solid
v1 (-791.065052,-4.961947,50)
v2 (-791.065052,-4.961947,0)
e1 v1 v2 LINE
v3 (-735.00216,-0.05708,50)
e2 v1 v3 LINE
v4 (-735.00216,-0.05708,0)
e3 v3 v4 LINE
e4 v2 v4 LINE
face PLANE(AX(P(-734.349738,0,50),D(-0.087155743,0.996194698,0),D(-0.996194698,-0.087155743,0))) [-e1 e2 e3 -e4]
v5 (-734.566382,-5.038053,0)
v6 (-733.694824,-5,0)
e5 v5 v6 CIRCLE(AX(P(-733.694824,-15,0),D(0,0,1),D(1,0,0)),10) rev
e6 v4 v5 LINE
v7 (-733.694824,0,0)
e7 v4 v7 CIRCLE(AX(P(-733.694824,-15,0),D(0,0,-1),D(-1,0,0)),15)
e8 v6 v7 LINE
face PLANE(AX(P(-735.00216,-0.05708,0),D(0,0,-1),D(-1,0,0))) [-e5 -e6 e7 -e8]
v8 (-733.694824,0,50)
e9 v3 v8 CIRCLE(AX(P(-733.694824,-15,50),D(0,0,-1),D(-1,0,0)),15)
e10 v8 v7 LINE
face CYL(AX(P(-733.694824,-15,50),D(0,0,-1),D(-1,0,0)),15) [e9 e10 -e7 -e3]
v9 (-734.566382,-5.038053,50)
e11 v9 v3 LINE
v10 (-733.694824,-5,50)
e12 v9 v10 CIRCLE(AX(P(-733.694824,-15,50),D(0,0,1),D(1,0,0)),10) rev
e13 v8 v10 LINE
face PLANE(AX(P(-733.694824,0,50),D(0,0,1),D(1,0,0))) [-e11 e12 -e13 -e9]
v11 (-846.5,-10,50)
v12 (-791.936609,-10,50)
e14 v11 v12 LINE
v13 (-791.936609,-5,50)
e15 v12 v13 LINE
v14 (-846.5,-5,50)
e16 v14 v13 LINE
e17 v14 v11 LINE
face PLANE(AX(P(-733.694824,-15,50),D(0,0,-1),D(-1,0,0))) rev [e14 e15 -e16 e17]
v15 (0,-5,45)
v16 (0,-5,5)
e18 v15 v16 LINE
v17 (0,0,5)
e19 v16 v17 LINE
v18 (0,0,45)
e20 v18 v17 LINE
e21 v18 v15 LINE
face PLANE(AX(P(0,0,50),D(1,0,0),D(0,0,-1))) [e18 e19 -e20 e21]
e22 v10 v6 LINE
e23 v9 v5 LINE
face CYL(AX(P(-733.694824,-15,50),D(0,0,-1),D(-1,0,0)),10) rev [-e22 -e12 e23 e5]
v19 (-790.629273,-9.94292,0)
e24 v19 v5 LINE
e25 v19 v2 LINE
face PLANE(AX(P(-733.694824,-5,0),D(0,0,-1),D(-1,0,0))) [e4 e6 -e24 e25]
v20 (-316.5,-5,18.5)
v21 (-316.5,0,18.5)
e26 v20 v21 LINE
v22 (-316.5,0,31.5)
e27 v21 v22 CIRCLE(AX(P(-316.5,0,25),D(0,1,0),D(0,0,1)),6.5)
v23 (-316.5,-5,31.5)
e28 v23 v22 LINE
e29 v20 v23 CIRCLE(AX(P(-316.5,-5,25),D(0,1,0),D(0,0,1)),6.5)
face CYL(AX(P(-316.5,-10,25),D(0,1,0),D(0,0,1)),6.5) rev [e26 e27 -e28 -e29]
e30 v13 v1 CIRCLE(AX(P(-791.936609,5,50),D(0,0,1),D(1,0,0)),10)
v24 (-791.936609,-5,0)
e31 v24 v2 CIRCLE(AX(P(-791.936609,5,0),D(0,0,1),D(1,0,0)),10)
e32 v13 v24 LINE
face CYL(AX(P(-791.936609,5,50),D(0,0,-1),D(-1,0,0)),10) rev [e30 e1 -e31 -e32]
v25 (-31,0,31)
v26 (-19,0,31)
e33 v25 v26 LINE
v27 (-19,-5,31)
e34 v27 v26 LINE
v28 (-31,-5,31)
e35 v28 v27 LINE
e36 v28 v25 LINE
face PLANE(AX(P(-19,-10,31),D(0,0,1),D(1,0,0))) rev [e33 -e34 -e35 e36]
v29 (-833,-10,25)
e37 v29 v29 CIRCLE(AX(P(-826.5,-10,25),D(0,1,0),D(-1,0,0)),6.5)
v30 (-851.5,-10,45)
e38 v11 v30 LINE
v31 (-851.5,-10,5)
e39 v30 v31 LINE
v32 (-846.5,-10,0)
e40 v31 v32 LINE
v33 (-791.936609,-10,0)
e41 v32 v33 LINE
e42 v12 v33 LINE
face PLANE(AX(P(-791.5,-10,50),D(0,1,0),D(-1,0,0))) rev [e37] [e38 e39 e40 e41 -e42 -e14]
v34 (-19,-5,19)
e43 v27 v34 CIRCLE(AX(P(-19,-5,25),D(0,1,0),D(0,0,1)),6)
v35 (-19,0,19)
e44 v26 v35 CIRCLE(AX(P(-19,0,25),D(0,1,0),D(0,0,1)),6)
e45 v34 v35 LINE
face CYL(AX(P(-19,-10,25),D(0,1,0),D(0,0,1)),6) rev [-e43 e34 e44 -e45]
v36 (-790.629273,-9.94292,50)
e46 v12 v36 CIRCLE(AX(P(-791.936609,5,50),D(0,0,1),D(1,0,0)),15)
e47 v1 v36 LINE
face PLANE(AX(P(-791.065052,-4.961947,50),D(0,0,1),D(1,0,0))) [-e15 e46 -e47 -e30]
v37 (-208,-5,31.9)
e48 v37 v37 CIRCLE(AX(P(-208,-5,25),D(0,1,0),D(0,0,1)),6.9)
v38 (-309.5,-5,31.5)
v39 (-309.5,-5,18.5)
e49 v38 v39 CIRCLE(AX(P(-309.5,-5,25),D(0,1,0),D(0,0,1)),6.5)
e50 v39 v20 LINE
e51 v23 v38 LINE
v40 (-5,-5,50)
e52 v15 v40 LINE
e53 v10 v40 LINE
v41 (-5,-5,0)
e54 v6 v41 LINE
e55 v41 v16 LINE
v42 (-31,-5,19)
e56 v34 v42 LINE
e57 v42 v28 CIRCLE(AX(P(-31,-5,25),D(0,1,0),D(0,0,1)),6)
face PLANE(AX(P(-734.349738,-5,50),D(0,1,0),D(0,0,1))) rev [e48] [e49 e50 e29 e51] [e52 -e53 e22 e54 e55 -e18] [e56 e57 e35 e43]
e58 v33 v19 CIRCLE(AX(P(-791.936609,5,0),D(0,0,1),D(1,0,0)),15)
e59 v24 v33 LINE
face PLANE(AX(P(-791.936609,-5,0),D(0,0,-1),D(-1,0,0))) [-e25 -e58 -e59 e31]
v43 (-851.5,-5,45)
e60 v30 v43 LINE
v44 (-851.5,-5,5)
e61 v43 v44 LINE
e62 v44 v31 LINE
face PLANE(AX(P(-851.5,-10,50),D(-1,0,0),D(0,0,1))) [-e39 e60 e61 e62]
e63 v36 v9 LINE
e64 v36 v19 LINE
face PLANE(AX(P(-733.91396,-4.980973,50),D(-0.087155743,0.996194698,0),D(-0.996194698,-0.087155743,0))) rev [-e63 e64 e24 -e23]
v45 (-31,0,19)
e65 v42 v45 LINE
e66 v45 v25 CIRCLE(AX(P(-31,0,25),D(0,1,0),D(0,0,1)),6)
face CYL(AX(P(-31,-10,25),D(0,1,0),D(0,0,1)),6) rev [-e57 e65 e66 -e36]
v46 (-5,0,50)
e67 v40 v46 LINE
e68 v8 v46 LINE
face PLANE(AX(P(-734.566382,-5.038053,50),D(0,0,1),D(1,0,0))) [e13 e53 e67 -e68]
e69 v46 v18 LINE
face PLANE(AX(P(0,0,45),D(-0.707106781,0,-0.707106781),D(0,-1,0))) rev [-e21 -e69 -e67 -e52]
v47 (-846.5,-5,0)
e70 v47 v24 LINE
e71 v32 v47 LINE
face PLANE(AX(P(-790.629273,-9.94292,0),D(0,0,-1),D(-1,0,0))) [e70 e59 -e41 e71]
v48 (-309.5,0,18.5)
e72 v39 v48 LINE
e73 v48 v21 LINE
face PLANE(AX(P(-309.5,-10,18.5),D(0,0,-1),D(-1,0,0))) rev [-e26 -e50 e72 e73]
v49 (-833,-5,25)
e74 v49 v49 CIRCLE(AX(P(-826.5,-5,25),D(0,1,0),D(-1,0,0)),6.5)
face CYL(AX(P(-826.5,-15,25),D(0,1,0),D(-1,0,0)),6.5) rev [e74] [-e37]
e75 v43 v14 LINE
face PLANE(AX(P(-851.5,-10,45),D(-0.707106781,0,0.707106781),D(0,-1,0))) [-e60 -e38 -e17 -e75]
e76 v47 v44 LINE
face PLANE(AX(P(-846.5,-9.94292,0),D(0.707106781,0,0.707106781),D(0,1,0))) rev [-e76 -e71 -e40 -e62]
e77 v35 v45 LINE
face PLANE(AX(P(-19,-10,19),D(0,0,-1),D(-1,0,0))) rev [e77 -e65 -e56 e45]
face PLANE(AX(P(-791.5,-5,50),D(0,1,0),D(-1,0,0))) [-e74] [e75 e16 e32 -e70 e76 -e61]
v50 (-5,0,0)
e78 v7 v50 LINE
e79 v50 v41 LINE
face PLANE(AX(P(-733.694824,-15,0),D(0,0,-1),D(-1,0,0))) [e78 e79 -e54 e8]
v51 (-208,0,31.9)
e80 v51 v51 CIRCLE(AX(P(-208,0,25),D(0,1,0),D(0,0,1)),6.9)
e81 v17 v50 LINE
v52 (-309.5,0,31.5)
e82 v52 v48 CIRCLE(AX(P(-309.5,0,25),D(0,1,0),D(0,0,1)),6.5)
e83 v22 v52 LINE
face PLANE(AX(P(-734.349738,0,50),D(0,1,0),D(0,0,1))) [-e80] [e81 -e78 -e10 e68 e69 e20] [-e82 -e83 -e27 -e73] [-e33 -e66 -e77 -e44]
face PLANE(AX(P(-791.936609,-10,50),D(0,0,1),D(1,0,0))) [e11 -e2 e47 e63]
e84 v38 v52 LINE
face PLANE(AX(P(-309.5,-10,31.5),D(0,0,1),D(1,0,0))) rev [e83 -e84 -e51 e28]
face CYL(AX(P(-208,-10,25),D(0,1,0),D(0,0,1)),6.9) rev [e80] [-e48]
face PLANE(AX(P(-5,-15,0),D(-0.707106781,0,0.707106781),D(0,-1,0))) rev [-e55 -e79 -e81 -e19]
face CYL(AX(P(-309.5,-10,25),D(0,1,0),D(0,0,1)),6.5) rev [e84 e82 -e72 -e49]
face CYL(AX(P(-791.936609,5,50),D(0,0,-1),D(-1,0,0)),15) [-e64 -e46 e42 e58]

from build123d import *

# Parameters (mm, degrees)
SM_BASE_FLANGE_1_DEPTH = 50
SKETCH_4_R             = 6.9
CUT_EXTRUDE_3_DEPTH    = 10
SKETCH_5_R             = 6.5
CUT_EXTRUDE_4_DEPTH    = 10
OTHER_START            = -10
OTHER_1_DEPTH          = 10
CUT_EXTRUDE_5_DEPTH    = 10


# Read off the part's stored shape, not the designer's step: Затупленный угол1
# Sheet-metal steps are written as plain solids
with BuildPart() as part:
    # Sketch 1 → Базовая кромка1 (new body)
    with BuildSketch(Plane.XY):
        with BuildLine():
            Line((-851.5, -5), (-791.936609429, -5))
            ThreePointArc((-791.936609429, -5), (-791.500415555, -4.990482216), (-791.065052002, -4.961946981))
            Line((-791.065052002, -4.961946981), (-735.002160484, -0.057079529))
            ThreePointArc((-735.002160484, -0.057079529), (-734.349115153, -0.014276676), (-733.694824343, 0))
            Line((-733.694824343, 0), (0, 0))
            Line((0, 0), (0, -5))
            Line((0, -5), (-733.694824343, -5))
            ThreePointArc((-733.694824343, -5), (-734.131018216, -5.009517784), (-734.56638177, -5.038053019))
            Line((-734.56638177, -5.038053019), (-790.629273288, -9.942920471))
            ThreePointArc((-790.629273288, -9.942920471), (-791.282318619, -9.985723324), (-791.936609429, -10))
            Line((-791.936609429, -10), (-851.5, -10))
            Line((-851.5, -10), (-851.5, -5))
        make_face()
    extrude(amount=SM_BASE_FLANGE_1_DEPTH)

    # Эскиз4 → Вырез-Вытянуть3 (cut)
    with BuildSketch(Plane(origin=(0, 0, 0), x_dir=(1, 0, 0), z_dir=(0, 1, 0))):
        with Locations(Location((-208, -25, 0), (0, 0, 270))):
            Circle(SKETCH_4_R)
        with BuildLine():
            Line((-309.5, -31.5), (-316.5, -31.5))
            ThreePointArc((-316.5, -31.5), (-323, -25), (-316.5, -18.5))
            Line((-316.5, -18.5), (-309.5, -18.5))
            ThreePointArc((-309.5, -18.5), (-303, -25), (-309.5, -31.5))
        make_face()
    extrude(amount=-CUT_EXTRUDE_3_DEPTH, mode=Mode.SUBTRACT)

    # Эскиз5 → Вырез-Вытянуть4 (cut)
    with BuildSketch(Plane(origin=(0, -5, 0), x_dir=(1, 0, 0), z_dir=(0, 1, 0))):
        with Locations(Location((-826.5, -25, 0), (0, 0, 180))):
            Circle(SKETCH_5_R)
    extrude(amount=-CUT_EXTRUDE_4_DEPTH, mode=Mode.SUBTRACT)

    # Other 1 outline → Other 1 (cut)
    with BuildSketch(Plane(origin=(0, 0, 0), x_dir=(1, 0, 0), z_dir=(0, 1, 0)).offset(OTHER_START)):
        Polygon((0, 0), (-5, 0), (0, -5), align=None)
        Polygon((0, -50), (0, -45), (-5, -50), align=None)
        Polygon((-851.5, 0), (-851.5, -5), (-846.5, 0), align=None)
        Polygon((-846.5, -50), (-851.5, -45), (-851.5, -50), align=None)
    extrude(amount=OTHER_1_DEPTH, mode=Mode.SUBTRACT)

    # Эскиз6 → Вырез-Вытянуть5 (cut)
    with BuildSketch(Plane(origin=(0, 0, 0), x_dir=(1, 0, 0), z_dir=(0, 1, 0))):
        with BuildLine():
            Line((-19, -31), (-31, -31))
            ThreePointArc((-31, -31), (-37, -25), (-31, -19))
            Line((-31, -19), (-19, -19))
            ThreePointArc((-19, -19), (-13, -25), (-19, -31))
        make_face()
    extrude(amount=-CUT_EXTRUDE_5_DEPTH, mode=Mode.SUBTRACT)


solid = part.part
